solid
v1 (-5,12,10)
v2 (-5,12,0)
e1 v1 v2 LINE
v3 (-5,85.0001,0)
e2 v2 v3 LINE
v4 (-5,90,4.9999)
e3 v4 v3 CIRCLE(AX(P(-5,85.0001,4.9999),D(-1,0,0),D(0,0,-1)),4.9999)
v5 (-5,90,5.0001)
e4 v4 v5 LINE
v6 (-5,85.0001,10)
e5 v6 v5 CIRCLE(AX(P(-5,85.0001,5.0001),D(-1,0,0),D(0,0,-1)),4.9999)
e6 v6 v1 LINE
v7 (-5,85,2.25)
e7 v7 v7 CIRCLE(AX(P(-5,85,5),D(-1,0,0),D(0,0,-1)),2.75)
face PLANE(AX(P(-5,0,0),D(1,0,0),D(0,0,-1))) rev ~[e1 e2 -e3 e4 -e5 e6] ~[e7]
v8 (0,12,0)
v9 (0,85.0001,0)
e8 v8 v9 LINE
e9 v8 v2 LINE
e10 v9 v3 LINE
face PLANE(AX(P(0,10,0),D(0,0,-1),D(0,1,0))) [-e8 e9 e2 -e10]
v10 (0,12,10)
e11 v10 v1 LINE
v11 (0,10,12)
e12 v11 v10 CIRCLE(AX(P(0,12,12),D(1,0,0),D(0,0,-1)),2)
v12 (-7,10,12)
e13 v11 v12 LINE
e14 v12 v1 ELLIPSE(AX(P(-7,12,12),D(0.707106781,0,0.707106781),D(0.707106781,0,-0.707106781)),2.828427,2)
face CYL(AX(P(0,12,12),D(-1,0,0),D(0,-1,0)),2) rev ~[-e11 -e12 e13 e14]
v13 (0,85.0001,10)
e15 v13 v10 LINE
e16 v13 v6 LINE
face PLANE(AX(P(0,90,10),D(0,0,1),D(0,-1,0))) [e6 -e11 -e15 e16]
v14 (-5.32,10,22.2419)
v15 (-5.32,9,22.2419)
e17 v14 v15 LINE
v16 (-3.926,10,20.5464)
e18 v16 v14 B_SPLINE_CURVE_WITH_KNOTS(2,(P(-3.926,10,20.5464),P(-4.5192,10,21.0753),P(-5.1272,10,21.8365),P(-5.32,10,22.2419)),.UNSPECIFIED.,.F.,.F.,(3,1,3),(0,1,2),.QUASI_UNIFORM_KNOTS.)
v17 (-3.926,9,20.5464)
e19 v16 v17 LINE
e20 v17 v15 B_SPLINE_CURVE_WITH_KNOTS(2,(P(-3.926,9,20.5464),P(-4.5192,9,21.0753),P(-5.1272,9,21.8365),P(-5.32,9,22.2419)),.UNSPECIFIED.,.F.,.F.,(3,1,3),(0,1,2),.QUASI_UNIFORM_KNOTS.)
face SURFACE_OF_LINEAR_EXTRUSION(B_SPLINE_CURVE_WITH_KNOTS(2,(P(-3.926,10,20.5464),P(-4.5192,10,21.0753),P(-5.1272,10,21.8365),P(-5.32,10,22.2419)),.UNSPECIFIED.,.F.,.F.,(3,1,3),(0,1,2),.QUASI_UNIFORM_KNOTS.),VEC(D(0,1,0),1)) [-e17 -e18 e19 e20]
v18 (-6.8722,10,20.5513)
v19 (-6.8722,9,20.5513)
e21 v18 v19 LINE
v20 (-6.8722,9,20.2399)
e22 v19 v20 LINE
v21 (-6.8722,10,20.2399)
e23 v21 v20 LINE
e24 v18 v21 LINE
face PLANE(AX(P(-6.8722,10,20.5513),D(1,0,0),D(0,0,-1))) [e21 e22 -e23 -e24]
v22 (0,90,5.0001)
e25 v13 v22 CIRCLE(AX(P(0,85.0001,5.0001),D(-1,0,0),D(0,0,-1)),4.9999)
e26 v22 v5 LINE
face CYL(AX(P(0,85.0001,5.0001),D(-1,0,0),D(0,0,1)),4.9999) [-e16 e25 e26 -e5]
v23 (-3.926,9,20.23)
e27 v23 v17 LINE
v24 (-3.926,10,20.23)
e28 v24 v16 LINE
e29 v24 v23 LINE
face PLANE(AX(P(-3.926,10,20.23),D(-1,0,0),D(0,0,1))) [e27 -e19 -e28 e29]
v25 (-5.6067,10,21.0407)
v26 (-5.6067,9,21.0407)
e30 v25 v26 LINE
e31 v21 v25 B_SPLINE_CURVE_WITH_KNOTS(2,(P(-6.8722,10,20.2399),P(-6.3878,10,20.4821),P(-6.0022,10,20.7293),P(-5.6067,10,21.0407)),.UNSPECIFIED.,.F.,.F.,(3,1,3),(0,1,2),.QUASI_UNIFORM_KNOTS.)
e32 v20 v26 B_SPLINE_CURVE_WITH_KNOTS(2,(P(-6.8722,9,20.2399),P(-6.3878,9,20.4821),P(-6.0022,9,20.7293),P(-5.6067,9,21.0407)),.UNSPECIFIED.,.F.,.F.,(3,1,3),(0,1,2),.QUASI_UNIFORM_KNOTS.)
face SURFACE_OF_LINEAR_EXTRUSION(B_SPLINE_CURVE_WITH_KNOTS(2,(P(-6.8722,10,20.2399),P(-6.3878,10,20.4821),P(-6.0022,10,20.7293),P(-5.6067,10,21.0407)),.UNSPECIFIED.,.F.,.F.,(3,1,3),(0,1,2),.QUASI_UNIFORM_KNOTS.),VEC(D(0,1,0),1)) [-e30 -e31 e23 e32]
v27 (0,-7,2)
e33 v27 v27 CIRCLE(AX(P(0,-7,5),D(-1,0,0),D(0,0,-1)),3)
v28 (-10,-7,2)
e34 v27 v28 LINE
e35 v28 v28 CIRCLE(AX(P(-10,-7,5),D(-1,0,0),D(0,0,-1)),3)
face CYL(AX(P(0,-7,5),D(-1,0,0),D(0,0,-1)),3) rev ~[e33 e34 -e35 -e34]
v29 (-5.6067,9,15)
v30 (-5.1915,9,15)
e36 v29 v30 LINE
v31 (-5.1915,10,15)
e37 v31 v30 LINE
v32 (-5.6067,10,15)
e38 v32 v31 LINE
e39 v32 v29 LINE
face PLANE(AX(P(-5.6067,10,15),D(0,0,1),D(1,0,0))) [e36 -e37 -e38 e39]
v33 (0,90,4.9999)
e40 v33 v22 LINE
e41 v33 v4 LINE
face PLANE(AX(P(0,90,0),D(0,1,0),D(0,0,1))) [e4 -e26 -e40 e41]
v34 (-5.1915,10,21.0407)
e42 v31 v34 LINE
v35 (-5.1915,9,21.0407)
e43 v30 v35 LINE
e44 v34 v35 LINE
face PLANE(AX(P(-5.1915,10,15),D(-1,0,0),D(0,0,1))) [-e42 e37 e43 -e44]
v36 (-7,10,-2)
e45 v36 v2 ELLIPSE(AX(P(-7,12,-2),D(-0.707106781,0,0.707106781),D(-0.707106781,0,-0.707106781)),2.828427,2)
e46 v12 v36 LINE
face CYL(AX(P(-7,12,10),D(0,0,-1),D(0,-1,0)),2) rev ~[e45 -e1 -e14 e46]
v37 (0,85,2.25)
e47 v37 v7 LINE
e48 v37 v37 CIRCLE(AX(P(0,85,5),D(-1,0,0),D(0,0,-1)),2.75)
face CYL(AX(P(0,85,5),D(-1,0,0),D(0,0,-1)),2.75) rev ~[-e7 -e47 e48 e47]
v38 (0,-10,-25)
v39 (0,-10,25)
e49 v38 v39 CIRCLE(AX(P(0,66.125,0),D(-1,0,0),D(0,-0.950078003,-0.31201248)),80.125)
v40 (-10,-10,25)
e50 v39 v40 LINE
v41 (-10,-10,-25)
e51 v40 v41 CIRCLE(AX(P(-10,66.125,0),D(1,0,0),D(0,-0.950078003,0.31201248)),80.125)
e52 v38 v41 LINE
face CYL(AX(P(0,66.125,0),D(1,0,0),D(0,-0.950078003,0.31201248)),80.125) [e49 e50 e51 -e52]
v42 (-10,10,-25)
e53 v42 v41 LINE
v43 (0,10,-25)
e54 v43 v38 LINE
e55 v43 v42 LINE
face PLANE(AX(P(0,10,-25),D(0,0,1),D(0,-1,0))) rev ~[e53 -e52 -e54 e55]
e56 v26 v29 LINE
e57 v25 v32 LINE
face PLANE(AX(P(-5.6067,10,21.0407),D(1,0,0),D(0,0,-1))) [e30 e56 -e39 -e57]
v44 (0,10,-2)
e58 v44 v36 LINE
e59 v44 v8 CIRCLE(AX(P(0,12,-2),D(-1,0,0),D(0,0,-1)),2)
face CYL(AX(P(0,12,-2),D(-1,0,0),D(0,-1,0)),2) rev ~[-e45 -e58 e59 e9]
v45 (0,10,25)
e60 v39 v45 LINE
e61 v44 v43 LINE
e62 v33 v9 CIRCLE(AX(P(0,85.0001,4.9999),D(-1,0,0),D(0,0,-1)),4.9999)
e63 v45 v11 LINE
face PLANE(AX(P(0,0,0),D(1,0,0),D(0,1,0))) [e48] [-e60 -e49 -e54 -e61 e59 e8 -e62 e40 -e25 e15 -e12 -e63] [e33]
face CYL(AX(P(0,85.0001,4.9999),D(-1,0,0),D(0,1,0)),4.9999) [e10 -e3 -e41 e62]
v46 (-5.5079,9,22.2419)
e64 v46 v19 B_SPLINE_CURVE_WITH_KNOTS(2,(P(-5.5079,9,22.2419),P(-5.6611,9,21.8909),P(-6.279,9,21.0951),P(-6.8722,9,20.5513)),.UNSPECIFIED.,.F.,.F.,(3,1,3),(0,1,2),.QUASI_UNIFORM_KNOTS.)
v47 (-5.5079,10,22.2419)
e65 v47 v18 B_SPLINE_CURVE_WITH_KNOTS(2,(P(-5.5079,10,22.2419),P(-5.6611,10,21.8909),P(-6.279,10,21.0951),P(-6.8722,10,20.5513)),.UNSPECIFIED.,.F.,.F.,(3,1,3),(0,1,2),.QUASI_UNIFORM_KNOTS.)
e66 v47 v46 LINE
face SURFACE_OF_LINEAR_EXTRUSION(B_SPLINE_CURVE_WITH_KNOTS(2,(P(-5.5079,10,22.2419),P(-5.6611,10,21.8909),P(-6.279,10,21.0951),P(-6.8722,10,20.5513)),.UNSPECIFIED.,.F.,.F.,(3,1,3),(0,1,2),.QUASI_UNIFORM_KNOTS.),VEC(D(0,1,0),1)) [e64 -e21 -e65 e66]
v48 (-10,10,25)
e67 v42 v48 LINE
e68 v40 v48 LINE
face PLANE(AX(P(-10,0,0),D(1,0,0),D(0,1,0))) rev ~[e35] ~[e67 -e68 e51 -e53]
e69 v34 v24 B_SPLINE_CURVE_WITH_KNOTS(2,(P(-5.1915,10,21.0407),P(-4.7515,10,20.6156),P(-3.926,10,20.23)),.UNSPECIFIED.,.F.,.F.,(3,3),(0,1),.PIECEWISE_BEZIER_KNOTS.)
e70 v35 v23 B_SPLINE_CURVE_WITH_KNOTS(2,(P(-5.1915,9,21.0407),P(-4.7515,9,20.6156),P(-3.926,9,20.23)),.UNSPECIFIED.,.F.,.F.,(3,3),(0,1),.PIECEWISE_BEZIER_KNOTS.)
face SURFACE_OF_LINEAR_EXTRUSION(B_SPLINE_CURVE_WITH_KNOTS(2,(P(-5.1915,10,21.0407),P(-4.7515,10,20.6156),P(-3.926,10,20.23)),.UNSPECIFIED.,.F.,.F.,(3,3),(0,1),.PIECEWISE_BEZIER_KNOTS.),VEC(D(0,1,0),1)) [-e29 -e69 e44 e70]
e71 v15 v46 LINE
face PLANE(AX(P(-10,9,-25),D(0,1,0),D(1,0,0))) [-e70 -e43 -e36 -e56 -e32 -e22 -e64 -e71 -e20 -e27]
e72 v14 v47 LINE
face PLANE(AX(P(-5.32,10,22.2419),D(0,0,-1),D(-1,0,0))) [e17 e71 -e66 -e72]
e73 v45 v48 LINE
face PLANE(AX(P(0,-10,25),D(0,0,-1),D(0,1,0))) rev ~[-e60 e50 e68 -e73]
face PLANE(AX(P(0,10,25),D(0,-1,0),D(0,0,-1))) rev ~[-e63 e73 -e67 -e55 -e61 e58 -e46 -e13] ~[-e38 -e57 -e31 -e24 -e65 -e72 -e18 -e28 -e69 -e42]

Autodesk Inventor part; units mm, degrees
ref_plane "YZ Plane" through (0, 0, 0) normal (1, 0, 0) x (0, 1, 0)
ref_plane "XZ Plane" through (0, 0, 0) normal (0, 1, 0) x (-1, 0, 0)
ref_plane "XY Plane" through (0, 0, 0) normal (0, 0, 1) x (1, 0, 0)
sketch "スケッチ1" plane through (0, 0, 0) normal (1, 0, 0) x (0, 1, 0)
  line L0 (-10, 25) -> (10, 25)
  line L1 (10, 25) -> (10, -25)
  line L2 (10, -25) -> (-10, -25)
  line L3 (-10, -25) -> (-10, 25)
  line L4 (-10, 25) -> (10, -25) construction
  line L5 (10, 25) -> (-10, -25) construction
  line L6 (10, 0) -> (-14, 0)
  arc A0 (-10, 25) -> (-10, -25) centre (66.125, 0) ccw
  point P0 (0, 0)
  dimension "d0" = 20
  dimension "d1" = 50
  dimension "d9" = 24
extrude "押し出し1" add sketch "スケッチ1" against normal blind 10
sketch "スケッチ2" plane through (0, 0, 0) normal (1, 0, 0) x (0, 0, -1)
  line L0 (-25, 10) -> (25, 10) projected
  line L1 (-10, 10) -> (0, 10)
  line L2 (0, 10) -> (0, 90)
  line L3 (0, 90) -> (-10, 90)
  line L4 (-10, 90) -> (-10, 10)
  point P0 (0, 0)
  point P1 (0, 10)
  dimension "d4" = 10
  dimension "d5" = 80
  dimension "d6" = 10
extrude "押し出し2" add sketch "スケッチ2" against normal blind 5
sketch "スケッチ3" plane through (0, 0, 0) normal (1, 0, 0) x (0, 0, -1)
  line L0 (25, 10) -> (0, 10) projected
  point P0 (0, 0)
  point P1 (-5, -7)
  dimension "d12" = 5
  dimension "d13" = 7
hole "穴1" at (0, -7, 5) direction (-1, 0, 0) diameter 6 end through all
sketch "スケッチ4" plane through (0, 0, 0) normal (1, 0, 0) x (0, 0, -1)
  line L0 (0, 90) -> (-10, 90) projected
  line L1 (0, 10) -> (0, 90) projected
  point P0 (0, 0)
  point P1 (-5, 85)
  point P2 (-5, 90)
  dimension "d21" = 5
  dimension "d22" = 5
hole "穴2" at (0, 85, 5) direction (-1, 0, 0) diameter 5.5 end through all
fillet "フィレット1" radius 2 3 edges at (-2.5, 10, 0) (-5, 10, 5) (-2.5, 10, 10)
fillet "フィレット2" radius 5 2 edges at (-2.5, 90, 0) (-2.5, 90, 10)
sketch "スケッチ5" plane through (-10, 10, -25) normal (0, 1, 0) x (1, 0, 0)
  line L0 (2.5, -40) -> (7.5, -40) construction
  line L1 (7.5, -40) -> (7.5, -45) construction
  line L2 (7.5, -45) -> (2.5, -45) construction
  line L3 (2.5, -45) -> (2.5, -40) construction
  line L4 (10, -37) -> (10, -50) projected
  line L5 (10, -50) -> (0, -50) projected
  line L6 (3.1278, -45.5513) -> (3.1278, -45.2399)
  spline S0 degree 2 poles (3.1278, -45.2399) (3.6122, -45.4821) (3.9978, -45.7293) (4.3933, -46.0407) knots 0 0 0 1 2 2 2
  line L7 (4.3933, -46.0407) -> (4.3933, -40)
  line L8 (4.3933, -40) -> (4.8085, -40)
  line L9 (4.8085, -40) -> (4.8085, -46.0407)
  spline S1 degree 2 poles (4.8085, -46.0407) (5.2485, -45.6156) (6.074, -45.23) knots 0 0 0 1 1 1
  line L10 (6.074, -45.23) -> (6.074, -45.5464)
  spline S2 degree 2 poles (6.074, -45.5464) (5.4808, -46.0753) (4.8728, -46.8365) (4.68, -47.2419) knots 0 0 0 1 2 2 2
  line L11 (4.68, -47.2419) -> (4.4921, -47.2419)
  spline S3 degree 2 poles (4.4921, -47.2419) (4.3389, -46.8909) (3.721, -46.0951) (3.1278, -45.5513) knots 0 0 0 1 2 2 2
  point P0 (10, -25)
  point P1 (7.5, -42.5)
  dimension "d34" = 2.5
  dimension "d35" = 5
  dimension "d36" = 5
  dimension "d37" = 5
extrude "押し出し3" cut sketch "スケッチ5" against normal blind 1
properties part number "受動歩行_ver2"
